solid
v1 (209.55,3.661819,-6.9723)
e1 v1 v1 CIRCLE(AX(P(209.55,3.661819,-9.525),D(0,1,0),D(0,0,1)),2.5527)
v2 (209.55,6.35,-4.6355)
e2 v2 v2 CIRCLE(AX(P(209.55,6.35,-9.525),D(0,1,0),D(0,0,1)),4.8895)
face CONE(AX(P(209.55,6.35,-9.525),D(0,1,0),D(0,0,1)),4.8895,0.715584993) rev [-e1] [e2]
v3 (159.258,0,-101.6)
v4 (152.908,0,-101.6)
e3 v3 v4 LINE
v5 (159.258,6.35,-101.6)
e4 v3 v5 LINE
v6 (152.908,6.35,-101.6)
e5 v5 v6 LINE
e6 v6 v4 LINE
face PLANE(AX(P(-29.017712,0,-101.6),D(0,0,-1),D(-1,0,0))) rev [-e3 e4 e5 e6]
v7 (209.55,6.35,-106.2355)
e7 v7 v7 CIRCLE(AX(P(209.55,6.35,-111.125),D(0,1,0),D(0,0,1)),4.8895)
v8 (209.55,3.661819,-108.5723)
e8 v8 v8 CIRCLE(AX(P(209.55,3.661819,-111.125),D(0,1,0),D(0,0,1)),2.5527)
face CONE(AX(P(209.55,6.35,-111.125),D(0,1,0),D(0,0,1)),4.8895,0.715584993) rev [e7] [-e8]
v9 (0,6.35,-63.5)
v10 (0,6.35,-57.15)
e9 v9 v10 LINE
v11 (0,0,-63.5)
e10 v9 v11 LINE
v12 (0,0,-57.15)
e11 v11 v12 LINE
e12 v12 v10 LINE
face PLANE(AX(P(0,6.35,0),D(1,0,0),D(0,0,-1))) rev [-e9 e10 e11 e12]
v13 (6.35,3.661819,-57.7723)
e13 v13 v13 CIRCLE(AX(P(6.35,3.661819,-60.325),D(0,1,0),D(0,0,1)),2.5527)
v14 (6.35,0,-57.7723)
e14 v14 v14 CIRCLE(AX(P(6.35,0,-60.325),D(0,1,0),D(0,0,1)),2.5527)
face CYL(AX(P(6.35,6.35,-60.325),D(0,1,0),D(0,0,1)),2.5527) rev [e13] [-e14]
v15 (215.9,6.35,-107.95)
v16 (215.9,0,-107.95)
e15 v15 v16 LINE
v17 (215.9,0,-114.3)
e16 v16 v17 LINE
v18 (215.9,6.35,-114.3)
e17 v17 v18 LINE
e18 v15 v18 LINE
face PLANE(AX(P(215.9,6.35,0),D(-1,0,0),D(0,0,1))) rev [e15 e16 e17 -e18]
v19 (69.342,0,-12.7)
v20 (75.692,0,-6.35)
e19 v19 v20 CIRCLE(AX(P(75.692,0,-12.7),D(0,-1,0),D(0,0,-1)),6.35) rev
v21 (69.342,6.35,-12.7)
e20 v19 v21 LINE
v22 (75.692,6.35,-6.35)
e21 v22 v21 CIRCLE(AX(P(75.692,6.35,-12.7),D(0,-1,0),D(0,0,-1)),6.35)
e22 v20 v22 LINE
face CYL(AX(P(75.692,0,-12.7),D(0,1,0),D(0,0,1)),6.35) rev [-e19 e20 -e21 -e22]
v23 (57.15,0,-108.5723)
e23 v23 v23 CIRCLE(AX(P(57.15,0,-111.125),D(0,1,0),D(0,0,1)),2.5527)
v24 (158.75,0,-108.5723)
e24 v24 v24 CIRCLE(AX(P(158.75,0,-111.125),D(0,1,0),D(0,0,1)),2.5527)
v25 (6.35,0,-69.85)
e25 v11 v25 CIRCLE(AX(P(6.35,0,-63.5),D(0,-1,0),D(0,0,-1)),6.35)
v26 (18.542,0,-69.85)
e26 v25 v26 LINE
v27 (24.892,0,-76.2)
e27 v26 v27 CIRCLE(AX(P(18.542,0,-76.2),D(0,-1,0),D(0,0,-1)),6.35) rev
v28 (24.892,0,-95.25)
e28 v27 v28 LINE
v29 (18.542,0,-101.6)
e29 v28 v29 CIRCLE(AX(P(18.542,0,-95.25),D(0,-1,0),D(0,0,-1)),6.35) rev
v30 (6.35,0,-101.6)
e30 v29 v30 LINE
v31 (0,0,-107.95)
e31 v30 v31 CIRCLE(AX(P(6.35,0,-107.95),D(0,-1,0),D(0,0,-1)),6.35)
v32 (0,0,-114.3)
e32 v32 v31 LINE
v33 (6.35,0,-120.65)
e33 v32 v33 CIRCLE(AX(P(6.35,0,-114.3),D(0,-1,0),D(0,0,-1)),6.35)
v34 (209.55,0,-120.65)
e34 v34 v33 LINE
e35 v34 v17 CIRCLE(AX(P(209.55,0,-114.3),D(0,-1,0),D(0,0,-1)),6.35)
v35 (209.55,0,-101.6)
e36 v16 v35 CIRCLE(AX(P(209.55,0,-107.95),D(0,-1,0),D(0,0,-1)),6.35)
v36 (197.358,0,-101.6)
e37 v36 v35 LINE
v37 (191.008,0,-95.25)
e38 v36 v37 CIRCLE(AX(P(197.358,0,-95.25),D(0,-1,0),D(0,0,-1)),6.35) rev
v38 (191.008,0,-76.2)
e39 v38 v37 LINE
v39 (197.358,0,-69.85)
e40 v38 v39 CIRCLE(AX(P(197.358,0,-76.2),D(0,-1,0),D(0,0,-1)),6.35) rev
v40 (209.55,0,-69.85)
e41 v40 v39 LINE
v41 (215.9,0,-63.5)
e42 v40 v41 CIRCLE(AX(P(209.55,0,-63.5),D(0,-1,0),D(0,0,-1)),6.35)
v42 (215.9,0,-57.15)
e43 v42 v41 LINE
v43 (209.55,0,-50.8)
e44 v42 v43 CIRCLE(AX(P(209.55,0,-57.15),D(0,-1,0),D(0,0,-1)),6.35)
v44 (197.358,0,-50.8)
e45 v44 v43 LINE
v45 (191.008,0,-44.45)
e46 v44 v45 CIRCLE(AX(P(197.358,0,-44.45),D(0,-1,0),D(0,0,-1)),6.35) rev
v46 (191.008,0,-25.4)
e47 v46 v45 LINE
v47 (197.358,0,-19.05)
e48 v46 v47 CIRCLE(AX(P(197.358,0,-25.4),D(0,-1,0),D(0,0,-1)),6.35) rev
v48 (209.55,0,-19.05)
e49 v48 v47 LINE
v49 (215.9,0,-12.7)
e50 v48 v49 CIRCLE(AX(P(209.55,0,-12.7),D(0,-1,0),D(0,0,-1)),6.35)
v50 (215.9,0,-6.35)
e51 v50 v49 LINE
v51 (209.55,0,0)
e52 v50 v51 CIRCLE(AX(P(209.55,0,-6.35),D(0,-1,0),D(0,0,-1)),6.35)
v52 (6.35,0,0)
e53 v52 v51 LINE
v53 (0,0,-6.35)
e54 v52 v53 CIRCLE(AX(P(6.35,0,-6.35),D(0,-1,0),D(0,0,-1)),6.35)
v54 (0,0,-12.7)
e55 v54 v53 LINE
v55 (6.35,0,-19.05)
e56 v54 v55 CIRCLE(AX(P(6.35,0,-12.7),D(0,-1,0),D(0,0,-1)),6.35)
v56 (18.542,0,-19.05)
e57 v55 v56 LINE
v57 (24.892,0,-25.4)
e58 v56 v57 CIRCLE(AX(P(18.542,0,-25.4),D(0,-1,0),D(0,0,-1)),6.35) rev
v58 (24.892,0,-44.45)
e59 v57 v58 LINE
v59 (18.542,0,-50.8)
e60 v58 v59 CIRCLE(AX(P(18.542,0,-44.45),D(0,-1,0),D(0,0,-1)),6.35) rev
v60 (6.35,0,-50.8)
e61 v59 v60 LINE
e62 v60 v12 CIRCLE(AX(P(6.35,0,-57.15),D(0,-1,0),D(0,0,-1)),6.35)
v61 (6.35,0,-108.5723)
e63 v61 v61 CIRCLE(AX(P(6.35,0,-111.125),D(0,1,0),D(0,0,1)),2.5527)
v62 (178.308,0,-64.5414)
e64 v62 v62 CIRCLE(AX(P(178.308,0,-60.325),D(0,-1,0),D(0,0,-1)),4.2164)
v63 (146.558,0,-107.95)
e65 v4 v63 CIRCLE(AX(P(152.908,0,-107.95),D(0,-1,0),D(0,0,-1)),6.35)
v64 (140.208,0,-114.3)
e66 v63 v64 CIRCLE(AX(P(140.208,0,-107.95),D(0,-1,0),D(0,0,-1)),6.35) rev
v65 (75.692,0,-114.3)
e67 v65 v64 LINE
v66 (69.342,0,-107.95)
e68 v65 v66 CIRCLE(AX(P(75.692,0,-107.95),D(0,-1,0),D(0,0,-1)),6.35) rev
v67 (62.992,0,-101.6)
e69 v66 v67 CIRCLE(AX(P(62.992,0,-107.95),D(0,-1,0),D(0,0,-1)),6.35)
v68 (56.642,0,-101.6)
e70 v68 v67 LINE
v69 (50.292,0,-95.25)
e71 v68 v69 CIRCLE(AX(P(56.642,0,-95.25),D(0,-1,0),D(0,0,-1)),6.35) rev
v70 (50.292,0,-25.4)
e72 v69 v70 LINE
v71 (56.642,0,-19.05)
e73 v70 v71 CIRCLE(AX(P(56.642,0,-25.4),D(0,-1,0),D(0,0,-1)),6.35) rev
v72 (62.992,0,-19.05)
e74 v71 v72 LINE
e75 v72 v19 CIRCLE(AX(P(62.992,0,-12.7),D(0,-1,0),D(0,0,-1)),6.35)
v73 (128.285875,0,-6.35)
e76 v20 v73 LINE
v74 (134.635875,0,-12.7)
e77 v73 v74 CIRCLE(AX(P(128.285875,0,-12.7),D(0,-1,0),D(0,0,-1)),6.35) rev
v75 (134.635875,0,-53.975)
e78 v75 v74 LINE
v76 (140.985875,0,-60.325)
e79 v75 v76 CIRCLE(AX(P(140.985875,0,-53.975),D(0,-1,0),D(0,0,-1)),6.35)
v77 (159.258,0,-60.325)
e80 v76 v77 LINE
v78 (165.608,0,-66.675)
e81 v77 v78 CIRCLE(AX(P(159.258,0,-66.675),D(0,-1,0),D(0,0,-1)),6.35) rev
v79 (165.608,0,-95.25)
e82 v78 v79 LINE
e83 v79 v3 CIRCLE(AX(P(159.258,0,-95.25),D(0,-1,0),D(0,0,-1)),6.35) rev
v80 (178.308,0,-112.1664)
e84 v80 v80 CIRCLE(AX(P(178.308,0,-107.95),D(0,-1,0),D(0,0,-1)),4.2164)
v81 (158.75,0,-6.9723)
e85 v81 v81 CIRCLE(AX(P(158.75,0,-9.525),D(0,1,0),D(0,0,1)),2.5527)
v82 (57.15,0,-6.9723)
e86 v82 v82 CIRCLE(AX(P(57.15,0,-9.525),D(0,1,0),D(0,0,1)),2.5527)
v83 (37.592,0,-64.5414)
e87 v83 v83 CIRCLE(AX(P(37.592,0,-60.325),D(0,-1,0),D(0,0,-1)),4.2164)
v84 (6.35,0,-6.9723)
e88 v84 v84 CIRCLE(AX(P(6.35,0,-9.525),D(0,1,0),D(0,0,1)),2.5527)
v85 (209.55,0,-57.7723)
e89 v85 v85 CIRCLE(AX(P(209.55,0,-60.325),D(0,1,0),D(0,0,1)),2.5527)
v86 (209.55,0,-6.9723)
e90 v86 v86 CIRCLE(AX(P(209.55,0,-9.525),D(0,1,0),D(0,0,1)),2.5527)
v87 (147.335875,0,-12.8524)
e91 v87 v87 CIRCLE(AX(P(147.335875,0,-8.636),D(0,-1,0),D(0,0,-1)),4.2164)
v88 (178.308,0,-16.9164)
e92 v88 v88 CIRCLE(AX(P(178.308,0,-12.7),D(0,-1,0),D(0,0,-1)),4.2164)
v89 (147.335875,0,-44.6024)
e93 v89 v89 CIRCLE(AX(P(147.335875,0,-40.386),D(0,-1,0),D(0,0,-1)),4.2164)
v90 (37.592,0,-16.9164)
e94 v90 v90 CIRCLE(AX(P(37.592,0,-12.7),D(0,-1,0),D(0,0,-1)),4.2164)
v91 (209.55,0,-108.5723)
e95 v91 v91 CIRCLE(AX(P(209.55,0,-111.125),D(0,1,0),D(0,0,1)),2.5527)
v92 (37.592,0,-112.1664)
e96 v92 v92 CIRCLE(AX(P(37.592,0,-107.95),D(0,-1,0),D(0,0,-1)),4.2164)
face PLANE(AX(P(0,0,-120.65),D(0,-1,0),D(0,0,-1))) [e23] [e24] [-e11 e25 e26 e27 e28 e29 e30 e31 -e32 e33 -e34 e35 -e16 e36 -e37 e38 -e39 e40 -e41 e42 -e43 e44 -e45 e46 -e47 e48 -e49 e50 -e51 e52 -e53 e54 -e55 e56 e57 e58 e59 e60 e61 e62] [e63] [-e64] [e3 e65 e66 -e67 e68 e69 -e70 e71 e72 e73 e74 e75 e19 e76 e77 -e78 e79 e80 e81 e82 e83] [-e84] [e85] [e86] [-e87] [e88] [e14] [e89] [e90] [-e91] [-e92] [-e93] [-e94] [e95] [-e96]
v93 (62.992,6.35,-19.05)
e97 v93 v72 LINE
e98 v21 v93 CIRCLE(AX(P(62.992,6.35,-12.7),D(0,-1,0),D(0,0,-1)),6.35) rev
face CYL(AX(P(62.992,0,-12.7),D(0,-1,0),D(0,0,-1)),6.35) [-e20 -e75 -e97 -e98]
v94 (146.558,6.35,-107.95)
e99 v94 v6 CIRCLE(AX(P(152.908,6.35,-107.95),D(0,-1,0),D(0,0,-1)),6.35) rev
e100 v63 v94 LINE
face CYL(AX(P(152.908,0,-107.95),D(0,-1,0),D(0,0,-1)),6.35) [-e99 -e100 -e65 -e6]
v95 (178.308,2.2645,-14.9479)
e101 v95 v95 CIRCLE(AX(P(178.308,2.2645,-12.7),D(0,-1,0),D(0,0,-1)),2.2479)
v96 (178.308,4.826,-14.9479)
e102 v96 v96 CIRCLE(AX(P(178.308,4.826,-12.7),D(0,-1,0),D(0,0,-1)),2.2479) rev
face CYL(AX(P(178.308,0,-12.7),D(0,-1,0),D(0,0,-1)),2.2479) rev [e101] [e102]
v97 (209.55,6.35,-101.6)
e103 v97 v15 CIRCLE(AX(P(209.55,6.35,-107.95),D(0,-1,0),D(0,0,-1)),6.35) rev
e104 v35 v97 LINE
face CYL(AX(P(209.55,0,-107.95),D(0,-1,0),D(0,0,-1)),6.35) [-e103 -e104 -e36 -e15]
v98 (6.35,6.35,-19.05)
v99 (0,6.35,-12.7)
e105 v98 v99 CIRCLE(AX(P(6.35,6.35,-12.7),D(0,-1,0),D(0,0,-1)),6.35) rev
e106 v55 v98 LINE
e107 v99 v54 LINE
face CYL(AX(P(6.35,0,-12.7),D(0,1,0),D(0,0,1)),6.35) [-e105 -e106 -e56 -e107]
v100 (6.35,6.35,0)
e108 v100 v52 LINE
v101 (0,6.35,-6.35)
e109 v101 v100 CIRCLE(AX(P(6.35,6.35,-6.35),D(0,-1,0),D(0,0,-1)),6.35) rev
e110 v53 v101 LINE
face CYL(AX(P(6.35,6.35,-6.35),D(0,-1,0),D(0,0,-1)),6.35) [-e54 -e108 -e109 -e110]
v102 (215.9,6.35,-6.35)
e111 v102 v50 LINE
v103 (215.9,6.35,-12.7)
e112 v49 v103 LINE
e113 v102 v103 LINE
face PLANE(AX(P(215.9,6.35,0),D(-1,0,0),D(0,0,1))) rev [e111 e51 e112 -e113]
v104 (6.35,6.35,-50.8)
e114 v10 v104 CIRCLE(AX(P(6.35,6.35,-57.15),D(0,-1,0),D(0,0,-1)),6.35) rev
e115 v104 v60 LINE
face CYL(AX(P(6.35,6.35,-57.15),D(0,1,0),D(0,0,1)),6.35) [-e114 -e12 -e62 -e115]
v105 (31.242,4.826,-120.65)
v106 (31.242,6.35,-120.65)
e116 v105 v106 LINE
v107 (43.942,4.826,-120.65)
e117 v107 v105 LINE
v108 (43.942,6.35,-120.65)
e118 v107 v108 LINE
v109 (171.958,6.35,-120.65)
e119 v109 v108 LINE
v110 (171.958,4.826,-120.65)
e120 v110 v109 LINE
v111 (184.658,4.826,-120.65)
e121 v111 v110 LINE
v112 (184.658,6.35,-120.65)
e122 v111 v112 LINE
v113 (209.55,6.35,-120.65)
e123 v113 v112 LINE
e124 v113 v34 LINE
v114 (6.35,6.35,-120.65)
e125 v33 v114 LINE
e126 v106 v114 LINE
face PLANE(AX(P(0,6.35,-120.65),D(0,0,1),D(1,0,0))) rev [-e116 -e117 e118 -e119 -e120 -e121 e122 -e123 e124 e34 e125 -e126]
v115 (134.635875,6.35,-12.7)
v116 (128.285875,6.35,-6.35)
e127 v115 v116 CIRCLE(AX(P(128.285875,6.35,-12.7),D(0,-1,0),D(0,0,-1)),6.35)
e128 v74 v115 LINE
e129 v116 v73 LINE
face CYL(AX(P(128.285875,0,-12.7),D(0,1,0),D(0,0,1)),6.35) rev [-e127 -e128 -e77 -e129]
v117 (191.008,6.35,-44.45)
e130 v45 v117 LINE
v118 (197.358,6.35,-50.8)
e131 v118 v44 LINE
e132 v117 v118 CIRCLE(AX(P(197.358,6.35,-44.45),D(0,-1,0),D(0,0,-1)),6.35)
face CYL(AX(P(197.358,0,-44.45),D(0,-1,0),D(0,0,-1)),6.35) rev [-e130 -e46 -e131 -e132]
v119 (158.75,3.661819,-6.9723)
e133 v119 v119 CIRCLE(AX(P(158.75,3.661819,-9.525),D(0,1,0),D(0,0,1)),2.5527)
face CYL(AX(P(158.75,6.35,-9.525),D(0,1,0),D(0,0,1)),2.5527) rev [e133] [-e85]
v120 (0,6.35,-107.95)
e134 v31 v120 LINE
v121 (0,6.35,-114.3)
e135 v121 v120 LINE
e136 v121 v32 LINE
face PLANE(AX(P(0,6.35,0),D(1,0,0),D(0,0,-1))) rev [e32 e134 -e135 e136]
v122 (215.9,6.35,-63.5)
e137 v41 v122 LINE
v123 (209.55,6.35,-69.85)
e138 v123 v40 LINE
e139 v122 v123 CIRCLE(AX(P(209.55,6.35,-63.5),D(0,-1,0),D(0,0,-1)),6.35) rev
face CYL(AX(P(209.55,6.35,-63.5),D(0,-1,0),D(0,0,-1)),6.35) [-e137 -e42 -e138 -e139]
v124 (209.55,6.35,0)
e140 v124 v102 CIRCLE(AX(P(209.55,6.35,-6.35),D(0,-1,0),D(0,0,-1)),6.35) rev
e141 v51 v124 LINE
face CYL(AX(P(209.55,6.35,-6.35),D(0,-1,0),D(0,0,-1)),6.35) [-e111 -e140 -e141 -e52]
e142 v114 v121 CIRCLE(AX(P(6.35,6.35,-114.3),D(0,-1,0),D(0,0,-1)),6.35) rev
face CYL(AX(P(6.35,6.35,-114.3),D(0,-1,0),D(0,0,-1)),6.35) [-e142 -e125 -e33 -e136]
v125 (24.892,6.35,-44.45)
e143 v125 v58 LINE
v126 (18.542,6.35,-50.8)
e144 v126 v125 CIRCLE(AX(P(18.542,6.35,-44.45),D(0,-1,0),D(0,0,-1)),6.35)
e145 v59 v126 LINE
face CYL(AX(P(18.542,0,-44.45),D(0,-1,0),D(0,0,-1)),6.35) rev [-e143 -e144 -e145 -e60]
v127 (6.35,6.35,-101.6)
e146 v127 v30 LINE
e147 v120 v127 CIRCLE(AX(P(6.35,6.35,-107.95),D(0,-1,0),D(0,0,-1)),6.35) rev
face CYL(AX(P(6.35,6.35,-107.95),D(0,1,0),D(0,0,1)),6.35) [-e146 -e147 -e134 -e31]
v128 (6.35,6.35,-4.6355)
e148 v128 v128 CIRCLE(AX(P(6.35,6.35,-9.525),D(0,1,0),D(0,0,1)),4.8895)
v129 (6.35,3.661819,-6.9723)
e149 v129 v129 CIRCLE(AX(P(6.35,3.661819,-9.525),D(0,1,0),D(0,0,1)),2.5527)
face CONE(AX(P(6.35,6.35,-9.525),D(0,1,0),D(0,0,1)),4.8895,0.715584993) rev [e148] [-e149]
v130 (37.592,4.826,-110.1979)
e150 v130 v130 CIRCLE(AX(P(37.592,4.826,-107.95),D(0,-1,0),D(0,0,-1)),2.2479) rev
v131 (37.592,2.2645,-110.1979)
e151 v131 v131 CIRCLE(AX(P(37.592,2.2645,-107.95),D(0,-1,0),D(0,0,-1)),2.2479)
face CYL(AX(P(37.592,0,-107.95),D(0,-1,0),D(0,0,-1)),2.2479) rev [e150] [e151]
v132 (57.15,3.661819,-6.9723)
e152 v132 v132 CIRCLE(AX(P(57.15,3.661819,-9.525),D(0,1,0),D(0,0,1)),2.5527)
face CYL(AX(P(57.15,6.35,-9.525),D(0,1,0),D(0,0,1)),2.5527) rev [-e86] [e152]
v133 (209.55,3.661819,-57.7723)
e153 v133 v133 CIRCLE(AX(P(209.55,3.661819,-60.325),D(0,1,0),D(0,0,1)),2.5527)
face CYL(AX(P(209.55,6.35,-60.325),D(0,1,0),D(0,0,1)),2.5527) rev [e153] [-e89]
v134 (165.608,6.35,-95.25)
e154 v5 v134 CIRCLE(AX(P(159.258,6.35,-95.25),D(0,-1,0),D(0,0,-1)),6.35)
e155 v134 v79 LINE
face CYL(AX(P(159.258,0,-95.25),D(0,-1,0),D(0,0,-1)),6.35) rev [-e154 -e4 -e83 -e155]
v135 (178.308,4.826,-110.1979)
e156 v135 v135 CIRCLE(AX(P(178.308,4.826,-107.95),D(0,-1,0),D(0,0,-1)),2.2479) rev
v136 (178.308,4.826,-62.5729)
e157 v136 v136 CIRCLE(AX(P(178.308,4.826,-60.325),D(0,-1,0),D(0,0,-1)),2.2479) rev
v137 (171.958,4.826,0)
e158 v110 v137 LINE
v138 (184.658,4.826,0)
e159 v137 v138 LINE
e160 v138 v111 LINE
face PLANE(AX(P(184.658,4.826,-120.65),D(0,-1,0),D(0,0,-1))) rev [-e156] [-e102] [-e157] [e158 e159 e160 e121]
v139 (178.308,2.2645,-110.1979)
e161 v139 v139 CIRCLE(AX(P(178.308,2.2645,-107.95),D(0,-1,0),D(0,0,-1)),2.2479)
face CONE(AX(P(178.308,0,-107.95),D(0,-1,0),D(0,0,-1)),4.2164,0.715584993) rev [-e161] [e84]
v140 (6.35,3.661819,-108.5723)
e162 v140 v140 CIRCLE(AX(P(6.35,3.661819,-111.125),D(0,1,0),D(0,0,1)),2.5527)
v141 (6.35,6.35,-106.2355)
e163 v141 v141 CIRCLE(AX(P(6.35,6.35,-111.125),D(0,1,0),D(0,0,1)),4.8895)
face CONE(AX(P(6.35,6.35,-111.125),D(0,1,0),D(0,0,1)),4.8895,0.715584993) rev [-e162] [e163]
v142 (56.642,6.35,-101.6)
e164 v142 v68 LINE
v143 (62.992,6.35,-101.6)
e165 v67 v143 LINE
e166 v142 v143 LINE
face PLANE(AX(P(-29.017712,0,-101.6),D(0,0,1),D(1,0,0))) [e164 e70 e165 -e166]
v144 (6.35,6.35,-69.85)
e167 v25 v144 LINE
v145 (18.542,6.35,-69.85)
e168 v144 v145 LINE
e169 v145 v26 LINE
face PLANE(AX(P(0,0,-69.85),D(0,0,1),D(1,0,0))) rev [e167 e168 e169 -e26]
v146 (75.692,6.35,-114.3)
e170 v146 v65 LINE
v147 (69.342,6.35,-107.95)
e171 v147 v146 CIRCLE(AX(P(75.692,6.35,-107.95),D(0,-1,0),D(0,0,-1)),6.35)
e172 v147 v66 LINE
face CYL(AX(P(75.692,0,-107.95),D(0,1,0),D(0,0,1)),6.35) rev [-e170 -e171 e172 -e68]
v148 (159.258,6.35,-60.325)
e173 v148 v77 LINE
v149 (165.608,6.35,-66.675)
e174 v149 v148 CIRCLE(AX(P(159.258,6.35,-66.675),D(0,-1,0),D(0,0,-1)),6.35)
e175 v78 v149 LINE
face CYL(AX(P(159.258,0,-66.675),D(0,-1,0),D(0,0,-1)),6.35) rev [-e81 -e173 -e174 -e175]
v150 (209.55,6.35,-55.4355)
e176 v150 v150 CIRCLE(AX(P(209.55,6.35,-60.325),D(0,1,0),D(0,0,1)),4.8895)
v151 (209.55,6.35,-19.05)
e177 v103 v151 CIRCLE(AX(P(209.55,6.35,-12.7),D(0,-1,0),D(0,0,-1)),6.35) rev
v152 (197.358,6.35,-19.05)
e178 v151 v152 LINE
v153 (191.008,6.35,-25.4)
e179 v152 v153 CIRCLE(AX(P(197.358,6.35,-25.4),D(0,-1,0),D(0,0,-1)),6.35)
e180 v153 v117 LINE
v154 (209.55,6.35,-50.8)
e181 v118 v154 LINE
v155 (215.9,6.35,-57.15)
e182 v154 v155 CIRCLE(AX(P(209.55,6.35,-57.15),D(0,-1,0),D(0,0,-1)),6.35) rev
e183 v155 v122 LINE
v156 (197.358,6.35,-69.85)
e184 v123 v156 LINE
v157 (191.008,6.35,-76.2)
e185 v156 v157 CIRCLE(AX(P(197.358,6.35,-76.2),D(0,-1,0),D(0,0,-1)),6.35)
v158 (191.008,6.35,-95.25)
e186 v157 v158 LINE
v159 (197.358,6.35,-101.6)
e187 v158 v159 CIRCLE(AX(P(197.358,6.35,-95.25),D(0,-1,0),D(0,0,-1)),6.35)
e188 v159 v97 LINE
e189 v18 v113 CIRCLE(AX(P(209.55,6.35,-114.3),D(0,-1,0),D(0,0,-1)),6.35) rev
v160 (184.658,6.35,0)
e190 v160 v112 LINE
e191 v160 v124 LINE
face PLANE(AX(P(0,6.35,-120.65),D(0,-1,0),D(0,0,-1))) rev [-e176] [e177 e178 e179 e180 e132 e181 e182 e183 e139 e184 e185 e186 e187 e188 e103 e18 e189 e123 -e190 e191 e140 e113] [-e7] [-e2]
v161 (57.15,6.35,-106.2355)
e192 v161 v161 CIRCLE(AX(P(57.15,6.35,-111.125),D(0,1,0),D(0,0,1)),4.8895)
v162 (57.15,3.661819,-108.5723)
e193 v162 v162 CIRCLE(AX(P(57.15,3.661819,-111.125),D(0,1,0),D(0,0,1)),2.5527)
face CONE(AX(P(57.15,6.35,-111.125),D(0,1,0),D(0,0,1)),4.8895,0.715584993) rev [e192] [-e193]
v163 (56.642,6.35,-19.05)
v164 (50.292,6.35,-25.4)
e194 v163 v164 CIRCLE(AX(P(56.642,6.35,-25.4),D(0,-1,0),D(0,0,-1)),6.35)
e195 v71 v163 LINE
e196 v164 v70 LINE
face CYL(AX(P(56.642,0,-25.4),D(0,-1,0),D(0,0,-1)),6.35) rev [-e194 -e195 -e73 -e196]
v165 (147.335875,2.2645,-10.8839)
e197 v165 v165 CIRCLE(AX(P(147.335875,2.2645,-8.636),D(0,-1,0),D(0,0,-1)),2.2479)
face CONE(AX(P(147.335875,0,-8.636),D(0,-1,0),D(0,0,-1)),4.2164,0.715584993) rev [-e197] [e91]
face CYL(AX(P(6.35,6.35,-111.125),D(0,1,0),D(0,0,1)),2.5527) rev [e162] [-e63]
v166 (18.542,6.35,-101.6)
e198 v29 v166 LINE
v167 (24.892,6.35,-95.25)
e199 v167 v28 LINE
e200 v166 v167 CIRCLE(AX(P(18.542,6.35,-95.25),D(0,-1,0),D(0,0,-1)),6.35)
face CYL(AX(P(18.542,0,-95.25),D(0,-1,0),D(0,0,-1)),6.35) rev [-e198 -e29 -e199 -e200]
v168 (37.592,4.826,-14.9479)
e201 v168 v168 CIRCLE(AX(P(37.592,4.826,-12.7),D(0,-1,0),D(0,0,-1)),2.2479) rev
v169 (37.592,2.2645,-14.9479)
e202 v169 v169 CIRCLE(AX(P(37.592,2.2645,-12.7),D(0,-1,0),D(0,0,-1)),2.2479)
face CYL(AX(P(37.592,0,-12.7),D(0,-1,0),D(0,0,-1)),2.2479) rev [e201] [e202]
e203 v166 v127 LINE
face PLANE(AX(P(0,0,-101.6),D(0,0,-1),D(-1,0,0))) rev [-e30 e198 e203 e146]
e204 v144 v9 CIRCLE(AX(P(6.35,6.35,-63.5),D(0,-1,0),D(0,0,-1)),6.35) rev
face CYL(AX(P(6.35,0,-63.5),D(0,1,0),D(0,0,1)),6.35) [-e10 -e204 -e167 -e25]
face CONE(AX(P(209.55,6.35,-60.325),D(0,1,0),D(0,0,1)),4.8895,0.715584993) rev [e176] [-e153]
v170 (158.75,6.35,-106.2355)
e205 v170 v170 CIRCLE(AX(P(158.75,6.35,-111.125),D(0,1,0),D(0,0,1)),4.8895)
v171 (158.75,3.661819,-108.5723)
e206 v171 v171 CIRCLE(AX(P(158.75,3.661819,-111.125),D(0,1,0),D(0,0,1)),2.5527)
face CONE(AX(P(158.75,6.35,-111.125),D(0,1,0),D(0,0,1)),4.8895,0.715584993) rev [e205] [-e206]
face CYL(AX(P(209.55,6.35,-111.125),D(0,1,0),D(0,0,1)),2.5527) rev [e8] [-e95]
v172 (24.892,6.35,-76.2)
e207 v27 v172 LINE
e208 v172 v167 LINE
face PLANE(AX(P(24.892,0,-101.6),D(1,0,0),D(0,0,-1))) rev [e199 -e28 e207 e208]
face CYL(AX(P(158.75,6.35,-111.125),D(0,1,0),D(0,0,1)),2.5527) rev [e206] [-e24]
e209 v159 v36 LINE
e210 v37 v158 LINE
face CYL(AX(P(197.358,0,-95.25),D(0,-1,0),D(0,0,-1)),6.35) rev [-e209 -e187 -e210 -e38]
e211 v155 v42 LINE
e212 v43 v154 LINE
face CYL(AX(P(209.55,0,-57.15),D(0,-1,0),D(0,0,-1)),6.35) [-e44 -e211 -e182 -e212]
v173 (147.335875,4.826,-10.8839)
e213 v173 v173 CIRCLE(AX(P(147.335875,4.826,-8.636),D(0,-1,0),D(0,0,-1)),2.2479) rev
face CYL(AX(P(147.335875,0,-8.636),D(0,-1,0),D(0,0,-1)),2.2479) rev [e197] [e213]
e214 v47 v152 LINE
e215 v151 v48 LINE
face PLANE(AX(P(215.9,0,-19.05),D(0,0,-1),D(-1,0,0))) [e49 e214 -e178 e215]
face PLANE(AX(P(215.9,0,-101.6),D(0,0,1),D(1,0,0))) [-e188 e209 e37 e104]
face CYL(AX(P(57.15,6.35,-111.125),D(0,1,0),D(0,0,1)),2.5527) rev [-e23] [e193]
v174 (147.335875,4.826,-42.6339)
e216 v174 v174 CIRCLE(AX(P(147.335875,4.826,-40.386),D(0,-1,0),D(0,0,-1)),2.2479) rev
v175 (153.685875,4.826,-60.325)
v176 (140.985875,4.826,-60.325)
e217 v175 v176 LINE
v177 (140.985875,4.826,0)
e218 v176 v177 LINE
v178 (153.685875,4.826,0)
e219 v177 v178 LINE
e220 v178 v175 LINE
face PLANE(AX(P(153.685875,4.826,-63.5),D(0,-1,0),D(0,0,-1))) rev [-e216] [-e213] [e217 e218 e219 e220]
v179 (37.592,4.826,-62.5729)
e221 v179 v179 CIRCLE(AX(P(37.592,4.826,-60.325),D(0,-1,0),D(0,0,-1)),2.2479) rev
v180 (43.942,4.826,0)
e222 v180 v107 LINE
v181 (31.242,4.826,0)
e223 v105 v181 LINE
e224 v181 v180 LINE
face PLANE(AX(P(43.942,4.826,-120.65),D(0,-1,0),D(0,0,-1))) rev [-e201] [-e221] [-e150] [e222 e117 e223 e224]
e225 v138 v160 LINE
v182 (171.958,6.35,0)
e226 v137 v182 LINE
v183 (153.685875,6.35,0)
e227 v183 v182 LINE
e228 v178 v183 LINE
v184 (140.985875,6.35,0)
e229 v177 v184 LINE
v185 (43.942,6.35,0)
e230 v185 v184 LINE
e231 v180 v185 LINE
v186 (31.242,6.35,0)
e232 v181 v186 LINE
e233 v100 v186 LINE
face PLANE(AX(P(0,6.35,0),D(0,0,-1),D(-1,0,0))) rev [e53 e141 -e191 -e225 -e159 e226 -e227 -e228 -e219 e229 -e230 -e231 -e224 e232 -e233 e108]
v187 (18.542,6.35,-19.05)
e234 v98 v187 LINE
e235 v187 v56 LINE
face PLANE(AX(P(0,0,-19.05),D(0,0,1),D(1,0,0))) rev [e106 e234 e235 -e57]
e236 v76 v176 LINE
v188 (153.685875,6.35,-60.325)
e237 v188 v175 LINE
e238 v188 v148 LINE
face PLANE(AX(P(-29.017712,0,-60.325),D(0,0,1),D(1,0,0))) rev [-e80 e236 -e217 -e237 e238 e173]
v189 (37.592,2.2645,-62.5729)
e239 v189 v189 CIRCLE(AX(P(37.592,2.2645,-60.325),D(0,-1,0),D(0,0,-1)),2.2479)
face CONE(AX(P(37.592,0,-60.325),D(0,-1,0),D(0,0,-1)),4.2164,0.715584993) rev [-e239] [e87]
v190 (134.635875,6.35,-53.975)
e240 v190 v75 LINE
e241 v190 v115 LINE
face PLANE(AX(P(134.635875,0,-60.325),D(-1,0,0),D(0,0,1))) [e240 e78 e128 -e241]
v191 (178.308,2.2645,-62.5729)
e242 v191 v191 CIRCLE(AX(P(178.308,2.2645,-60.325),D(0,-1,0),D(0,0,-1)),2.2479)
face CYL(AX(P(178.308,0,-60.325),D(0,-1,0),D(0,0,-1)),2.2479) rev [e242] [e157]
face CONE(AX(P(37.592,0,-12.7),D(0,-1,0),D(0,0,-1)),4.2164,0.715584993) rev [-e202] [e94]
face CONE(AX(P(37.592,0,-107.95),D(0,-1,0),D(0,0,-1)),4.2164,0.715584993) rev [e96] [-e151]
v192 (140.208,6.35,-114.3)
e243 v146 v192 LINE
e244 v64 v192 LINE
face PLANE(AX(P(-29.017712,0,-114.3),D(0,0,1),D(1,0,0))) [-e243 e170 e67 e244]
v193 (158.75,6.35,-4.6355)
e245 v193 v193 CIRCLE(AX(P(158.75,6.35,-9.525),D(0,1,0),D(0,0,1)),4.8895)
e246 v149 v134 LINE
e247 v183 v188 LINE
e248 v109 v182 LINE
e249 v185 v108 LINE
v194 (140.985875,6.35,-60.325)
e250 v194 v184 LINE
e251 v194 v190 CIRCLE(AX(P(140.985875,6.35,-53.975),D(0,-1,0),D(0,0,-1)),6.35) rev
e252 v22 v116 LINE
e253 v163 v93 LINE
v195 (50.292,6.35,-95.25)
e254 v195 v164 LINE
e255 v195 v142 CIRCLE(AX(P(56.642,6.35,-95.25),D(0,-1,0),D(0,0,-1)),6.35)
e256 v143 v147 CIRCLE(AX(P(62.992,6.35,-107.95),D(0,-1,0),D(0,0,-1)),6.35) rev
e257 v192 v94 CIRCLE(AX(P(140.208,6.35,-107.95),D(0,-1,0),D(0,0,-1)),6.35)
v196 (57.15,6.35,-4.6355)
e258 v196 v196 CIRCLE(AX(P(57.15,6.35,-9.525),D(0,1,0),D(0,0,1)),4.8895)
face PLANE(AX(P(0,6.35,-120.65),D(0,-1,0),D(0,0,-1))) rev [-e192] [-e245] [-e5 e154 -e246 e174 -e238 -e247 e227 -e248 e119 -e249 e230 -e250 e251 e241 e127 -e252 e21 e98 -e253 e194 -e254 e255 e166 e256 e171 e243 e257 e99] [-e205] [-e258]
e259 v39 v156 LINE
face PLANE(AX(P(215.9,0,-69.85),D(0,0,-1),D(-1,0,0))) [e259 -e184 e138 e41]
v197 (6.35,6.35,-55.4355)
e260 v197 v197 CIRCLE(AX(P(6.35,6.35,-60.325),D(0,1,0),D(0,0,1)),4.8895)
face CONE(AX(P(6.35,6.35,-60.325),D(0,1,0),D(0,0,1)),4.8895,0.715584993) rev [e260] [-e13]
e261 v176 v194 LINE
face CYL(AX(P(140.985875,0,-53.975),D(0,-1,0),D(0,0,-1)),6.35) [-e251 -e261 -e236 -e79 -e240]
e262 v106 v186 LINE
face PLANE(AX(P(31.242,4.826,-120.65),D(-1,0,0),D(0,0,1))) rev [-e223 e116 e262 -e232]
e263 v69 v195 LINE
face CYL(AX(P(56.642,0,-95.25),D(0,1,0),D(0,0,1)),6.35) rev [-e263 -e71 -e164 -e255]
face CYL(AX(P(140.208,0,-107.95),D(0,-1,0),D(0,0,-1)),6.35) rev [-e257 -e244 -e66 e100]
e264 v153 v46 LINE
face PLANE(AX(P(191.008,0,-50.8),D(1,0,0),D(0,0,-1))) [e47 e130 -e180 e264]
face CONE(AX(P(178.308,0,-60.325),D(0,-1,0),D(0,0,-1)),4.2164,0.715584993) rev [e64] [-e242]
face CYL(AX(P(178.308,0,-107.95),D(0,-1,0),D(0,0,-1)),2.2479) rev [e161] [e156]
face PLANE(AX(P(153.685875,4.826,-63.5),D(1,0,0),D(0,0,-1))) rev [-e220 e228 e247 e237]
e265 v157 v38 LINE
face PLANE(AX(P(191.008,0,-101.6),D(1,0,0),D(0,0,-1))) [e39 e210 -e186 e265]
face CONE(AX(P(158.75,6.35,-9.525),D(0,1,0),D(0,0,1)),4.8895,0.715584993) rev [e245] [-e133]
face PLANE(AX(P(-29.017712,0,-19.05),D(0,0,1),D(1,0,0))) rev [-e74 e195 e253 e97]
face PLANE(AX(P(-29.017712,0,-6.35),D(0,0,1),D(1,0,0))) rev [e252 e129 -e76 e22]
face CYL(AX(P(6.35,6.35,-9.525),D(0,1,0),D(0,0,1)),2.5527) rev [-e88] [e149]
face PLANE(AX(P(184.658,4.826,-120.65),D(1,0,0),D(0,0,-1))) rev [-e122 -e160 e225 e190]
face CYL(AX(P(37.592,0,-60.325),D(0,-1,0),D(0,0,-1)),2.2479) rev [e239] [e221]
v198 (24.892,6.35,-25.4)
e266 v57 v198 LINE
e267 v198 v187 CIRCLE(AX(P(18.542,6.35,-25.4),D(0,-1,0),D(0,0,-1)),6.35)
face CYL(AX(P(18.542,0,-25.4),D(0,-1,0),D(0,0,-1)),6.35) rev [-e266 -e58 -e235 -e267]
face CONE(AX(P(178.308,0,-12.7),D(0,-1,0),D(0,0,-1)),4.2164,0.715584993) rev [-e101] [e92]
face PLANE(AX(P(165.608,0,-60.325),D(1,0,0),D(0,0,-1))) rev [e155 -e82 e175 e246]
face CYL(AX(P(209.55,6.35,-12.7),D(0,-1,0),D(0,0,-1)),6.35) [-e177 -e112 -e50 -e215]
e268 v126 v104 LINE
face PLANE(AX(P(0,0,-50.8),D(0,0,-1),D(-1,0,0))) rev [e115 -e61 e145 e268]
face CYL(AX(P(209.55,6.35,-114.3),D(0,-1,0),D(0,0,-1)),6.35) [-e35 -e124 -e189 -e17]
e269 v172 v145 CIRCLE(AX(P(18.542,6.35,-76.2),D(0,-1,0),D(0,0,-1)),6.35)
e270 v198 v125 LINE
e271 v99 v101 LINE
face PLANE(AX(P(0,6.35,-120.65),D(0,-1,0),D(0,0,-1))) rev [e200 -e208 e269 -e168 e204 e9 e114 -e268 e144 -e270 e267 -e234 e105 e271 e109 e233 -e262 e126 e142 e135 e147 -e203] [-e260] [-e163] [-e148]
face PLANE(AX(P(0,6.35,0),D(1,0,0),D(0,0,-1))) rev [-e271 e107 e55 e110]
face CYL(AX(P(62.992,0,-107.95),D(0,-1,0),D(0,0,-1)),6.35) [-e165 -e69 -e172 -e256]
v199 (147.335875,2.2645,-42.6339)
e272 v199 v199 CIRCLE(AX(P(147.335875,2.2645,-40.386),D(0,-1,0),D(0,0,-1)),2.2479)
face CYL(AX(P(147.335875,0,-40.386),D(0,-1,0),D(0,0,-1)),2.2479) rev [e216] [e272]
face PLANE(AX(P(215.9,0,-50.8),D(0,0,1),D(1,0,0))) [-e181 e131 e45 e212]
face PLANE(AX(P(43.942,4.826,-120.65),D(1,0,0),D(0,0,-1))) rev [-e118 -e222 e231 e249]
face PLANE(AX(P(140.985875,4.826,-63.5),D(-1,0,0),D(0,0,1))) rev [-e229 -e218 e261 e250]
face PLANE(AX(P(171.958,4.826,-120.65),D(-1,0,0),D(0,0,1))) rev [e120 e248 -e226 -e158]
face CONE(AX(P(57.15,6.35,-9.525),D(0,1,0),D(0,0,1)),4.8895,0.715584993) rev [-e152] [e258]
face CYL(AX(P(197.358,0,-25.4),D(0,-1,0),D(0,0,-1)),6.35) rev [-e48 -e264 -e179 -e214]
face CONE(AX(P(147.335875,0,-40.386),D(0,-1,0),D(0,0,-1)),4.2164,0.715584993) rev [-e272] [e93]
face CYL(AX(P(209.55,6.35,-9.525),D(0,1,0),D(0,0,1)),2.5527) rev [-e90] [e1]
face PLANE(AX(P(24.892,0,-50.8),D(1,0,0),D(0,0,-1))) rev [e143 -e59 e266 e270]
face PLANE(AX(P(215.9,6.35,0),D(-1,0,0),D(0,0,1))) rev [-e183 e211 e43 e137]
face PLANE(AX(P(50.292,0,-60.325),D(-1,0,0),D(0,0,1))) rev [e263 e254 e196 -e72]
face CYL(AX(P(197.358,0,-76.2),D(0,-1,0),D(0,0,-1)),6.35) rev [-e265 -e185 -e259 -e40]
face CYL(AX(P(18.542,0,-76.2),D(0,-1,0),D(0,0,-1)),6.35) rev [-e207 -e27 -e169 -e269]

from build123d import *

# Parameters (mm, degrees)
SKETCH1_W                                       = 215.9
SKETCH1_H                                       = 120.65
BOSS_EXTRUDE1_DEPTH                             = 6.35
CSK_FOR_10_FLAT_HEAD_MACHINE_SCREW1_D           = 5.1054
CSK_FOR_10_FLAT_HEAD_MACHINE_SCREW1_CSINK_D     = 9.779
CSK_FOR_10_FLAT_HEAD_MACHINE_SCREW1_CSINK_ANGLE = 82
CSK_FOR_8_FLAT_HEAD_MACHINE_SCREW1_D            = 4.4958
CSK_FOR_8_FLAT_HEAD_MACHINE_SCREW1_CSINK_D      = 8.4328
CSK_FOR_8_FLAT_HEAD_MACHINE_SCREW1_CSINK_ANGLE  = 82
CSK_FOR_8_FLAT_HEAD_MACHINE_SCREW2_D            = 4.4958
CSK_FOR_8_FLAT_HEAD_MACHINE_SCREW2_CSINK_D      = 8.4328
CSK_FOR_8_FLAT_HEAD_MACHINE_SCREW2_CSINK_ANGLE  = 82
SKETCH10_W                                      = 12.7
SKETCH10_H                                      = 120.65
SKETCH10_H_2                                    = 63.5
CUT_EXTRUDE1_DEPTH                              = 1.524
SKETCH13_W                                      = 24.892
SKETCH13_H                                      = 31.75
CUT_EXTRUDE2_DEPTH                              = 248.405648682
FILLET2_R                                       = 6.35
SKETCH14_W                                      = 12.7
SKETCH14_H                                      = 3.175
CUT_EXTRUDE4_DEPTH                              = 248.405648682
FILLET4_R                                       = 6.35


with BuildPart() as part:
    # Sketch1 → Boss-Extrude1 (new body)
    with BuildSketch(Plane(origin=(0, 0, 0), x_dir=(1, 0, 0), z_dir=(0, 1, 0))):
        with Locations((107.95, 60.325)):
            Rectangle(SKETCH1_W, SKETCH1_H)
    extrude(amount=BOSS_EXTRUDE1_DEPTH)

    # CSK for #10 Flat Head Machine Screw1 (through all)
    with Locations(Plane(origin=(0, 6.35, 0), x_dir=(-1, 0, 0), z_dir=(0, 1, 0))):
        with Locations((-6.35, -111.125), (-209.55, -111.125), (-209.55, -9.525), (-6.35, -9.525), (-6.35, -60.325), (-209.55, -60.325), (-158.75, -111.125), (-57.15, -111.125), (-57.15, -9.525), (-158.75, -9.525)):
            CounterSinkHole(CSK_FOR_10_FLAT_HEAD_MACHINE_SCREW1_D / 2, CSK_FOR_10_FLAT_HEAD_MACHINE_SCREW1_CSINK_D / 2, counter_sink_angle=CSK_FOR_10_FLAT_HEAD_MACHINE_SCREW1_CSINK_ANGLE)

    # CSK for #8 Flat Head Machine Screw1 (through all)
    with Locations(Plane.XZ):
        with Locations((37.592, -12.7), (37.592, -60.325), (37.592, -107.95)):
            csk_for_8_flat_head_machine_screw1 = CounterSinkHole(CSK_FOR_8_FLAT_HEAD_MACHINE_SCREW1_D / 2, CSK_FOR_8_FLAT_HEAD_MACHINE_SCREW1_CSINK_D / 2, counter_sink_angle=CSK_FOR_8_FLAT_HEAD_MACHINE_SCREW1_CSINK_ANGLE)

    # Mirror1: CSK for #8 Flat Head Machine Screw1 across plane
    add(csk_for_8_flat_head_machine_screw1.mirror(Plane.ZY.offset(-107.95)), mode=Mode.SUBTRACT)

    # CSK for #8 Flat Head Machine Screw2 (through all)
    with Locations(Plane.XZ):
        with Locations((147.335875, -8.636), (147.335875, -40.386)):
            CounterSinkHole(CSK_FOR_8_FLAT_HEAD_MACHINE_SCREW2_D / 2, CSK_FOR_8_FLAT_HEAD_MACHINE_SCREW2_CSINK_D / 2, counter_sink_angle=CSK_FOR_8_FLAT_HEAD_MACHINE_SCREW2_CSINK_ANGLE)

    # Sketch10 → Cut-Extrude1 (cut)
    with BuildSketch(Plane(origin=(0, 6.35, 0), x_dir=(1, 0, 0), z_dir=(0, 1, 0))):
        with Locations((37.592, 60.325)):
            Rectangle(SKETCH10_W, SKETCH10_H)
        with Locations((178.308, 60.325)):
            Rectangle(SKETCH10_W, SKETCH10_H)
        with Locations((147.335875, 31.75)):
            Rectangle(SKETCH10_W, SKETCH10_H_2)
    extrude(amount=-CUT_EXTRUDE1_DEPTH, mode=Mode.SUBTRACT)

    # Sketch13 → Cut-Extrude2 (cut, through all)
    with BuildSketch(Plane(origin=(0, 6.35, 0), x_dir=(1, 0, 0), z_dir=(0, 1, 0))):
        with Locations((12.446, 85.725)):
            Rectangle(SKETCH13_W, SKETCH13_H)
        with Locations((12.446, 34.925)):
            Rectangle(SKETCH13_W, SKETCH13_H)
    cut_extrude2 = extrude(amount=-CUT_EXTRUDE2_DEPTH, mode=Mode.SUBTRACT)

    # Mirror4: Cut-Extrude2 across plane
    add(cut_extrude2.mirror(Plane.ZY.offset(-107.95)), mode=Mode.SUBTRACT)

    # Fillet2
    fillet2_edges = [part.edges().sort_by_distance(p)[0] for p in [
        (0, 3.175, -69.85),
        (0, 3.175, -101.6),
        (24.892, 3.175, -101.6),
        (24.892, 3.175, -69.85),
        (0, 3.175, -19.05),
        (0, 3.175, -50.8),
        (24.892, 3.175, -50.8),
        (24.892, 3.175, -19.05),
        (215.9, 3.175, -101.6),
        (215.9, 3.175, -69.85),
        (191.008, 3.175, -69.85),
        (191.008, 3.175, -101.6),
        (215.9, 3.175, -50.8),
        (215.9, 3.175, -19.05),
        (191.008, 3.175, -19.05),
        (191.008, 3.175, -50.8),
        (0, 3.175, -120.65),
        (215.9, 3.175, -120.65),
        (215.9, 3.175, 0),
        (0, 3.175, 0),
    ]]
    fillet(fillet2_edges, radius=FILLET2_R)

    # Sketch14 → Cut-Extrude4 (cut, through all)
    with BuildSketch(Plane(origin=(0, 6.35, 0), x_dir=(1, 0, 0), z_dir=(0, 1, 0))):
        Polygon((146.558, 114.3), (69.342, 114.3), (69.342, 101.6), (50.292, 101.6), (50.292, 19.05), (69.342, 19.05), (69.342, 6.35), (134.635875, 6.35), (134.635875, 19.05), (134.635875, 60.325), (140.985875, 60.325), (140.985875, 63.5), (153.685875, 63.5), (153.685875, 60.325), (165.608, 60.325), (165.608, 101.6), (146.558, 101.6), align=None)
        with Locations((147.335875, 61.9125)):
            Rectangle(SKETCH14_W, SKETCH14_H)
    extrude(amount=-CUT_EXTRUDE4_DEPTH, mode=Mode.SUBTRACT)

    # Fillet4
    fillet4_edges = [part.edges().sort_by_distance(p)[0] for p in [
        (165.608, 3.175, -101.6),
        (134.635875, 3.175, -6.35),
        (69.342, 3.175, -6.35),
        (50.292, 3.175, -19.05),
        (50.292, 3.175, -101.6),
        (69.342, 3.175, -114.3),
        (146.558, 3.175, -114.3),
        (69.342, 3.175, -19.05),
        (69.342, 3.175, -101.6),
        (146.558, 3.175, -101.6),
        (165.608, 3.175, -60.325),
        (134.635875, 3.175, -60.325),
    ]]
    fillet(fillet4_edges, radius=FILLET4_R - 0.0001)  # a hair under: the kernel refuses the full size


solid = part.part
